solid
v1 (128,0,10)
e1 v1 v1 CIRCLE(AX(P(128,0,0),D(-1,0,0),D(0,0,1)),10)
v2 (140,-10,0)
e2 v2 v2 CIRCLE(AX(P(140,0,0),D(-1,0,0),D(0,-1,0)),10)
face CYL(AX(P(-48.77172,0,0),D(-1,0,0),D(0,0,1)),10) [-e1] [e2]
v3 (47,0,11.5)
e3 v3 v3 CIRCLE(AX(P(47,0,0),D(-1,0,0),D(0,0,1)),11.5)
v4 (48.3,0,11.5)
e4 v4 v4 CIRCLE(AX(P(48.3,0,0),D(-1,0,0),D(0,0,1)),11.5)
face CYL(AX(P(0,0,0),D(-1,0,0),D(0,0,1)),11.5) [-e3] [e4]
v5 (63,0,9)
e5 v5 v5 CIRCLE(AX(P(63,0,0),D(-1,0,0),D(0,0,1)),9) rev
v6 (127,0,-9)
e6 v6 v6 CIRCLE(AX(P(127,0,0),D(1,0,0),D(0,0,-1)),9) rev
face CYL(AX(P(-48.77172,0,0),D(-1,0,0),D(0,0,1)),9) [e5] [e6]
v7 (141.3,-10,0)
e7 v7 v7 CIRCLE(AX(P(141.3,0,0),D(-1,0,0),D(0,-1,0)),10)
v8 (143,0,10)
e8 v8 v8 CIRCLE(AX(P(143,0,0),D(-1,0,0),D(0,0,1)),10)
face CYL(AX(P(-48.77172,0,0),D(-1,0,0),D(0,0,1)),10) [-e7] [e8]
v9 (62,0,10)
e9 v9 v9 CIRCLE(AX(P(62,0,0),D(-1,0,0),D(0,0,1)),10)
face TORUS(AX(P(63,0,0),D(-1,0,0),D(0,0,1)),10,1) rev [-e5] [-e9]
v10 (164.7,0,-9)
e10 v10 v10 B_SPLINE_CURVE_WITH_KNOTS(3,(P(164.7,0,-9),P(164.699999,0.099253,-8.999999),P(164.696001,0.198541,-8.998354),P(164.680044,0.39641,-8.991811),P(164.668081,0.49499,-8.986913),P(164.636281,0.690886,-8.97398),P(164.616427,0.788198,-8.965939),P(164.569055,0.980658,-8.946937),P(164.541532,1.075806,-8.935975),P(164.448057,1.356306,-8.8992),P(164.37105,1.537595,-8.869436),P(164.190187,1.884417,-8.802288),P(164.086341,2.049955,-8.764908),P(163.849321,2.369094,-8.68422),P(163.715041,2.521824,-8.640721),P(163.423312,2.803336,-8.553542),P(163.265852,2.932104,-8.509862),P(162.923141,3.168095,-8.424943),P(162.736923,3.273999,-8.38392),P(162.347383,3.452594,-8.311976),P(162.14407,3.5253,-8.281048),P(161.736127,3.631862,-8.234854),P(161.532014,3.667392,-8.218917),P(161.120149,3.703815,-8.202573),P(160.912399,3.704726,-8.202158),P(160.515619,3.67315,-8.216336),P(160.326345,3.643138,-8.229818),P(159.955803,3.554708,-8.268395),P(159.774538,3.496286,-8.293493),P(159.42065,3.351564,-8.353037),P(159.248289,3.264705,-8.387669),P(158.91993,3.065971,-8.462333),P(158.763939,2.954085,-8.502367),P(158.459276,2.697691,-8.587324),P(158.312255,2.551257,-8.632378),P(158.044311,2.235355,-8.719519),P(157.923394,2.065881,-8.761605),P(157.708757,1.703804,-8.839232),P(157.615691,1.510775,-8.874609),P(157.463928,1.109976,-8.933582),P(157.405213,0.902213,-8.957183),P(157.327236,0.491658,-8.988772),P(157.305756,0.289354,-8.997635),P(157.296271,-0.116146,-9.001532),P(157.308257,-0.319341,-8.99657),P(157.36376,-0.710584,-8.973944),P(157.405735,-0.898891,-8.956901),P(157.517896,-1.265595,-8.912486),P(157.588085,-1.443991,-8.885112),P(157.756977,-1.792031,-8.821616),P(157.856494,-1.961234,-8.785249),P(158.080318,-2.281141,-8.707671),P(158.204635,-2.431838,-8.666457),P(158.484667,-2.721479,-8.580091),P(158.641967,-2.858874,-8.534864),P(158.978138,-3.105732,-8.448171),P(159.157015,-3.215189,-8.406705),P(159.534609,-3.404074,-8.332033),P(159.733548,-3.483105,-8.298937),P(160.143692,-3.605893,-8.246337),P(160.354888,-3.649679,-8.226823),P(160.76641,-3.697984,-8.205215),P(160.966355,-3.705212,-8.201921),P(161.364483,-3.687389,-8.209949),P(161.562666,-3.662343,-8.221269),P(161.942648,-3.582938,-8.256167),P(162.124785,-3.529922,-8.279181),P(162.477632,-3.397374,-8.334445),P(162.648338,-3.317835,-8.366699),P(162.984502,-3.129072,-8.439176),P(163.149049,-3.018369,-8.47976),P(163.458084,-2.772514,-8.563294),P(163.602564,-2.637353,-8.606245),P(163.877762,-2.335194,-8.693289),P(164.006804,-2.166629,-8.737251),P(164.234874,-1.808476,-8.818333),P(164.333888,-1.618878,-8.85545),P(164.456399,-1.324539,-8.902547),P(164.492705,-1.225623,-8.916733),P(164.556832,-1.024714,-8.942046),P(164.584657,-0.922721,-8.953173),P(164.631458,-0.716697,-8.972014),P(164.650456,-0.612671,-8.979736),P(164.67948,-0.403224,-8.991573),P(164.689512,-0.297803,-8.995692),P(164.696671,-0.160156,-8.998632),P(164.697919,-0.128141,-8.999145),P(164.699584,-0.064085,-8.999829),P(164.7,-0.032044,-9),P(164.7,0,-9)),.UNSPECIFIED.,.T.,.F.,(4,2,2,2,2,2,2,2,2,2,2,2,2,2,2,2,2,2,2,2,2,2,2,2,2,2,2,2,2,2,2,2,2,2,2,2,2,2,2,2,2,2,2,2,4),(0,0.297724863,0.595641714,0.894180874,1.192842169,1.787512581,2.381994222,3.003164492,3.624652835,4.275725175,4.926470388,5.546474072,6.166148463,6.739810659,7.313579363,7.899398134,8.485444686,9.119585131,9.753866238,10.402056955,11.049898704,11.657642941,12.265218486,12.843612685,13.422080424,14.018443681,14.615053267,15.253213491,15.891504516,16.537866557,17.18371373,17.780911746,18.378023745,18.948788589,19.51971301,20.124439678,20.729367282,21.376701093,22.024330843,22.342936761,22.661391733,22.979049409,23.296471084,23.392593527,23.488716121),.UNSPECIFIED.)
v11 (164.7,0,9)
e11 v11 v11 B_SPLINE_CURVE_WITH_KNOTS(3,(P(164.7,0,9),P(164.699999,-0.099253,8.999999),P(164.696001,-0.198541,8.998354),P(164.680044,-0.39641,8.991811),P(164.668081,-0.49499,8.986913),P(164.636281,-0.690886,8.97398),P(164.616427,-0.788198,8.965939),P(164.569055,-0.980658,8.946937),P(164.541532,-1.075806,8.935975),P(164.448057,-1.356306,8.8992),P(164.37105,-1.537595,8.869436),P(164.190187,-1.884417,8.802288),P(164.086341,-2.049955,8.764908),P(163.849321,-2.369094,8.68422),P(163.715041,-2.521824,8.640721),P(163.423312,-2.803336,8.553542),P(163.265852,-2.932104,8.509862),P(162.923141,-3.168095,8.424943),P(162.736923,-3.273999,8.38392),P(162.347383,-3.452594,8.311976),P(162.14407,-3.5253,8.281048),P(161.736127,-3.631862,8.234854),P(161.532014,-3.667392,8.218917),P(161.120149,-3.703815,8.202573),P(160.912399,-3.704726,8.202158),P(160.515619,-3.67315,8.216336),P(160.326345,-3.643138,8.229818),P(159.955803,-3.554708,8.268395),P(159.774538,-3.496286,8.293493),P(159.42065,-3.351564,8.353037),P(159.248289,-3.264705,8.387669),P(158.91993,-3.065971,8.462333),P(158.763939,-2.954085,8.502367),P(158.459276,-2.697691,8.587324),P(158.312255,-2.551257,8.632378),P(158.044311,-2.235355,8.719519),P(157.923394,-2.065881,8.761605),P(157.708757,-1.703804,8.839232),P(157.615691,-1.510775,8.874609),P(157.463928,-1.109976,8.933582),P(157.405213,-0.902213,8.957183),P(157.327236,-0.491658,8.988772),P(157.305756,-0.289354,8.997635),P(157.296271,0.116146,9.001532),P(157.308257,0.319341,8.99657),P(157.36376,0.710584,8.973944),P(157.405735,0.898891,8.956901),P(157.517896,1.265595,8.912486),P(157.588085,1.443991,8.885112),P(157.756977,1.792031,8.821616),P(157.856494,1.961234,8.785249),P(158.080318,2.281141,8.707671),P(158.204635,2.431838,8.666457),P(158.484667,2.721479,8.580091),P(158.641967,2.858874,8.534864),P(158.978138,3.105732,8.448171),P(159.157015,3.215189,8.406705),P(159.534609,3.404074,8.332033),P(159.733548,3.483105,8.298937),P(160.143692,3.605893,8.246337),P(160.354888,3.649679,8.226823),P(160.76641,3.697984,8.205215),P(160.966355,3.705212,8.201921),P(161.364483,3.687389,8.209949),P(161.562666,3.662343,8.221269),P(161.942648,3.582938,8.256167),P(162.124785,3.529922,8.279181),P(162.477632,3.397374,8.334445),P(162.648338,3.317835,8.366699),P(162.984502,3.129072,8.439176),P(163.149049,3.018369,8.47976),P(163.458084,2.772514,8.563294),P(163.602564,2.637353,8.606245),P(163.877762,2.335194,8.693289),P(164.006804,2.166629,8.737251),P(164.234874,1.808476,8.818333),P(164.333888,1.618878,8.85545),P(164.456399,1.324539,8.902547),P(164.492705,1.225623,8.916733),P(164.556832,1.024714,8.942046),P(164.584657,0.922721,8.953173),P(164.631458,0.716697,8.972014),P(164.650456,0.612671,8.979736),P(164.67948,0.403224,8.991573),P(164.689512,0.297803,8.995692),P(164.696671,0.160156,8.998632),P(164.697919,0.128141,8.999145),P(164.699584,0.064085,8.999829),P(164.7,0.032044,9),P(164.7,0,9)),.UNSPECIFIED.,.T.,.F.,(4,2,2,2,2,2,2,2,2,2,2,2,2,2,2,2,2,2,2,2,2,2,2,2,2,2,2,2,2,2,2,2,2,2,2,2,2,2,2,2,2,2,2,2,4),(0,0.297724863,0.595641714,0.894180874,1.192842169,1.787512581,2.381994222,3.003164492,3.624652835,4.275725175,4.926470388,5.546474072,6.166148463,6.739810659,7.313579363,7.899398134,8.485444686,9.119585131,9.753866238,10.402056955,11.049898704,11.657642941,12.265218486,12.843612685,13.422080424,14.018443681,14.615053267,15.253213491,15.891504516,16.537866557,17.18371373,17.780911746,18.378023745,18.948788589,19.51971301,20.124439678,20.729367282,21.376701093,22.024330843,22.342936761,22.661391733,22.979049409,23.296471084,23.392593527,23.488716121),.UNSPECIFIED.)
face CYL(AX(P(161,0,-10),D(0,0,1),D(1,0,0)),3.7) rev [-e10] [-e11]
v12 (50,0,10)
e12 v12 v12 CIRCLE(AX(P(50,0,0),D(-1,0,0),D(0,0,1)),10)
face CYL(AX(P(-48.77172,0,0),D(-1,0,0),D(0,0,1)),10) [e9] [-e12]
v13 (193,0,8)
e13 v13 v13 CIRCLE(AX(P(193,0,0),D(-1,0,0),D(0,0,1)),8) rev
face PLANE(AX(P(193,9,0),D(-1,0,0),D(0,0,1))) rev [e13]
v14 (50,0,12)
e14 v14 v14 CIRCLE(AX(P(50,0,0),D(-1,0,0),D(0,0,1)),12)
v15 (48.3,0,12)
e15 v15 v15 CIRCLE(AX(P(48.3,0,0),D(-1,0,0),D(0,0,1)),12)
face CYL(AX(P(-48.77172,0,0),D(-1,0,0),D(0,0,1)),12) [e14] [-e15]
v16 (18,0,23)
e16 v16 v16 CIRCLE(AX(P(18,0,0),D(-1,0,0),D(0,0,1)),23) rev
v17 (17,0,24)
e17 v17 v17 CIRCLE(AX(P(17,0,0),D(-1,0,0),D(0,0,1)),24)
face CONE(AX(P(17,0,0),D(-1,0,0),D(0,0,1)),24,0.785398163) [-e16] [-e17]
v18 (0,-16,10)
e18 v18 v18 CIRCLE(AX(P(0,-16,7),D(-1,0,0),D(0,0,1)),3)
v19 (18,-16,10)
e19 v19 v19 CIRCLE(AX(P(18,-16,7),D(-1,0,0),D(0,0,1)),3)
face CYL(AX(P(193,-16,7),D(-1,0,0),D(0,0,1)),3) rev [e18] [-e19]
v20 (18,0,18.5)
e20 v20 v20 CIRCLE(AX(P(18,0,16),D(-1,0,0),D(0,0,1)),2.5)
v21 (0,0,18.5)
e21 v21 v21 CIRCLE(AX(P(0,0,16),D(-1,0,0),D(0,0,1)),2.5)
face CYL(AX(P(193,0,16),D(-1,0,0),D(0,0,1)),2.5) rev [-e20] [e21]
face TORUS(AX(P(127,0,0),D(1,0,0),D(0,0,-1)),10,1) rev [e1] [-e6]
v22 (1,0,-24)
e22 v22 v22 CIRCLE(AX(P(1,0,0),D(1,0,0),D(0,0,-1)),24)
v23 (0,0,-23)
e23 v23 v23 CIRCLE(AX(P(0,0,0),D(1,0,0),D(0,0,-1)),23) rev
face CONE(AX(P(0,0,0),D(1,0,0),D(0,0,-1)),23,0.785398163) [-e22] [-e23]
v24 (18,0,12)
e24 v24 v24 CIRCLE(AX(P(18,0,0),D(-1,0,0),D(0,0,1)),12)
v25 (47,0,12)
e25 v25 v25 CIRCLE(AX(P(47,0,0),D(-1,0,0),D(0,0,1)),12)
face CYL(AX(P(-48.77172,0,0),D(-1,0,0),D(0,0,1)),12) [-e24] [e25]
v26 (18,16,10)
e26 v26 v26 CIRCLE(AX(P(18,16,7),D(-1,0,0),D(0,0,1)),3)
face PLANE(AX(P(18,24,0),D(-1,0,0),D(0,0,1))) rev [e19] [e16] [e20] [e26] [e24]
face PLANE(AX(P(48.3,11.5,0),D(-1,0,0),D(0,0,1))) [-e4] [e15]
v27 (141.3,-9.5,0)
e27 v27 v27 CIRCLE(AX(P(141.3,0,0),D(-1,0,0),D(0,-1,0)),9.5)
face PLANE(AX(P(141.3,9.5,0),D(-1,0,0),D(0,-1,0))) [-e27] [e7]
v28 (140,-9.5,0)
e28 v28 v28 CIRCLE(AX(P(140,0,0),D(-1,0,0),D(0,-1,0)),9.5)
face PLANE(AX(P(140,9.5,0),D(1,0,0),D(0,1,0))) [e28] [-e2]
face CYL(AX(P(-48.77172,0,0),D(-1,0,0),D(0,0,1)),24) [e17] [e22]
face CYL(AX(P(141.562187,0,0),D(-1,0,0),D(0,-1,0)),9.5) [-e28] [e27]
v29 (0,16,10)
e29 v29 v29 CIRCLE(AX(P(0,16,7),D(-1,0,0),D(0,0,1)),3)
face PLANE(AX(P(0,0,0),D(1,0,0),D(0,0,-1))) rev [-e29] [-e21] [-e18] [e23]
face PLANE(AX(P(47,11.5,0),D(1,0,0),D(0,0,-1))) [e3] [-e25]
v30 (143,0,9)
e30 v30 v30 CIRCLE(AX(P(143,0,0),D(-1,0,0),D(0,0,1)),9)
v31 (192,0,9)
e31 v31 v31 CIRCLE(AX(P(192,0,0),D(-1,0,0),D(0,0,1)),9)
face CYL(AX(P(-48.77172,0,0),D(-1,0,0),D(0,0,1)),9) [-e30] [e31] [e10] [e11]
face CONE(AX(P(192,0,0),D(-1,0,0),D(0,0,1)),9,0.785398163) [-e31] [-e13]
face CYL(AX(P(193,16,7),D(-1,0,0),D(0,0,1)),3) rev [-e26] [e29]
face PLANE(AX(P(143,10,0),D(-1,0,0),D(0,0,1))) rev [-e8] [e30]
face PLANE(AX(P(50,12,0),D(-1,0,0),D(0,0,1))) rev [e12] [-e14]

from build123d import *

# Parameters (mm, degrees)
ESQUISSE2_W             = 1.3
ESQUISSE2_H             = 0.5
CONG_1_R                = 1
CHANFREIN1_SIZE         = 1
ESQUISSE3_R             = 3.7
ENL_V_MAT_EXTRU_1_DEPTH = 10
ESQUISSE4_R             = 3
ESQUISSE4_R_2           = 2.5
ENL_V_MAT_EXTRU_2_DEPTH = 196.961730958
ESQUISSE6_W             = 1.3
ESQUISSE6_H             = 0.5


with BuildPart() as part:
    # Esquisse1 → Base-Révolution (revolve)
    with BuildSketch(Plane.XY, mode=Mode.PRIVATE) as base_r_volution_sk:
        Polygon((0, 0), (0, 24), (18, 24), (18, 12), (50, 12), (50, 10), (62, 10), (62, 9), (128, 9), (128, 10), (143, 10), (143, 9), (193, 9), (193, 0), align=None)
    revolve(base_r_volution_sk.sketch.rotate(Axis((-48.771720193, 0, 0), (1, 0, 0)), 90), axis=Axis((-48.771720193, 0, 0), (1, 0, 0)))

    # Esquisse2 → Enlèvement de matière-Révolution1 (revolve, cut)
    with BuildSketch(Plane.XY, mode=Mode.PRIVATE) as enl_vement_de_mati_re_r_volution1_sk:
        with Locations((47.65, 11.75)):
            Rectangle(ESQUISSE2_W, ESQUISSE2_H)
    revolve(enl_vement_de_mati_re_r_volution1_sk.sketch.rotate(Axis((0, 0, 0), (1, 0, 0)), 90), axis=Axis((0, 0, 0), (1, 0, 0)), mode=Mode.SUBTRACT)

    # Congé1
    cong_1_edges = [part.edges().sort_by_distance(p)[0] for p in [
        (62, 0, -9),
        (128, 0, -9),
    ]]
    fillet(cong_1_edges, radius=CONG_1_R - 0.0001)  # a hair under: the kernel refuses the full size

    # Chanfrein1
    chanfrein1_edges = [part.edges().sort_by_distance(p)[0] for p in [
        (193, 0, -9),
        (18, 0, -24),
        (0, 0, -24),
    ]]
    chamfer(chanfrein1_edges, length=CHANFREIN1_SIZE)

    # Esquisse3 → Enlèv. mat.-Extru.1 (cut, symmetric)
    with BuildSketch(Plane.XY):
        with Locations((161, 0)):
            Circle(ESQUISSE3_R)
    extrude(amount=ENL_V_MAT_EXTRU_1_DEPTH, both=True, mode=Mode.SUBTRACT)

    # Esquisse4 → Enlèv. mat.-Extru.2 (cut, through all)
    with BuildSketch(Plane.ZY):
        with Locations((7, 16)):
            Circle(ESQUISSE4_R)
        with Locations((7, -16)):
            Circle(ESQUISSE4_R)
        with Locations((16, 0)):
            Circle(ESQUISSE4_R_2)
    extrude(amount=-ENL_V_MAT_EXTRU_2_DEPTH, mode=Mode.SUBTRACT)

    # Esquisse6 → Enlèvement de matière-Révolution2 (revolve, cut)
    with BuildSketch(Plane.XY, mode=Mode.PRIVATE) as enl_vement_de_mati_re_r_volution2_sk:
        with Locations((140.65, 9.75)):
            Rectangle(ESQUISSE6_W, ESQUISSE6_H)
    revolve(enl_vement_de_mati_re_r_volution2_sk.sketch.rotate(Axis((141.562186711, 0, 0), (1, 0, 0)), 90), axis=Axis((141.562186711, 0, 0), (1, 0, 0)), mode=Mode.SUBTRACT)


solid = part.part
